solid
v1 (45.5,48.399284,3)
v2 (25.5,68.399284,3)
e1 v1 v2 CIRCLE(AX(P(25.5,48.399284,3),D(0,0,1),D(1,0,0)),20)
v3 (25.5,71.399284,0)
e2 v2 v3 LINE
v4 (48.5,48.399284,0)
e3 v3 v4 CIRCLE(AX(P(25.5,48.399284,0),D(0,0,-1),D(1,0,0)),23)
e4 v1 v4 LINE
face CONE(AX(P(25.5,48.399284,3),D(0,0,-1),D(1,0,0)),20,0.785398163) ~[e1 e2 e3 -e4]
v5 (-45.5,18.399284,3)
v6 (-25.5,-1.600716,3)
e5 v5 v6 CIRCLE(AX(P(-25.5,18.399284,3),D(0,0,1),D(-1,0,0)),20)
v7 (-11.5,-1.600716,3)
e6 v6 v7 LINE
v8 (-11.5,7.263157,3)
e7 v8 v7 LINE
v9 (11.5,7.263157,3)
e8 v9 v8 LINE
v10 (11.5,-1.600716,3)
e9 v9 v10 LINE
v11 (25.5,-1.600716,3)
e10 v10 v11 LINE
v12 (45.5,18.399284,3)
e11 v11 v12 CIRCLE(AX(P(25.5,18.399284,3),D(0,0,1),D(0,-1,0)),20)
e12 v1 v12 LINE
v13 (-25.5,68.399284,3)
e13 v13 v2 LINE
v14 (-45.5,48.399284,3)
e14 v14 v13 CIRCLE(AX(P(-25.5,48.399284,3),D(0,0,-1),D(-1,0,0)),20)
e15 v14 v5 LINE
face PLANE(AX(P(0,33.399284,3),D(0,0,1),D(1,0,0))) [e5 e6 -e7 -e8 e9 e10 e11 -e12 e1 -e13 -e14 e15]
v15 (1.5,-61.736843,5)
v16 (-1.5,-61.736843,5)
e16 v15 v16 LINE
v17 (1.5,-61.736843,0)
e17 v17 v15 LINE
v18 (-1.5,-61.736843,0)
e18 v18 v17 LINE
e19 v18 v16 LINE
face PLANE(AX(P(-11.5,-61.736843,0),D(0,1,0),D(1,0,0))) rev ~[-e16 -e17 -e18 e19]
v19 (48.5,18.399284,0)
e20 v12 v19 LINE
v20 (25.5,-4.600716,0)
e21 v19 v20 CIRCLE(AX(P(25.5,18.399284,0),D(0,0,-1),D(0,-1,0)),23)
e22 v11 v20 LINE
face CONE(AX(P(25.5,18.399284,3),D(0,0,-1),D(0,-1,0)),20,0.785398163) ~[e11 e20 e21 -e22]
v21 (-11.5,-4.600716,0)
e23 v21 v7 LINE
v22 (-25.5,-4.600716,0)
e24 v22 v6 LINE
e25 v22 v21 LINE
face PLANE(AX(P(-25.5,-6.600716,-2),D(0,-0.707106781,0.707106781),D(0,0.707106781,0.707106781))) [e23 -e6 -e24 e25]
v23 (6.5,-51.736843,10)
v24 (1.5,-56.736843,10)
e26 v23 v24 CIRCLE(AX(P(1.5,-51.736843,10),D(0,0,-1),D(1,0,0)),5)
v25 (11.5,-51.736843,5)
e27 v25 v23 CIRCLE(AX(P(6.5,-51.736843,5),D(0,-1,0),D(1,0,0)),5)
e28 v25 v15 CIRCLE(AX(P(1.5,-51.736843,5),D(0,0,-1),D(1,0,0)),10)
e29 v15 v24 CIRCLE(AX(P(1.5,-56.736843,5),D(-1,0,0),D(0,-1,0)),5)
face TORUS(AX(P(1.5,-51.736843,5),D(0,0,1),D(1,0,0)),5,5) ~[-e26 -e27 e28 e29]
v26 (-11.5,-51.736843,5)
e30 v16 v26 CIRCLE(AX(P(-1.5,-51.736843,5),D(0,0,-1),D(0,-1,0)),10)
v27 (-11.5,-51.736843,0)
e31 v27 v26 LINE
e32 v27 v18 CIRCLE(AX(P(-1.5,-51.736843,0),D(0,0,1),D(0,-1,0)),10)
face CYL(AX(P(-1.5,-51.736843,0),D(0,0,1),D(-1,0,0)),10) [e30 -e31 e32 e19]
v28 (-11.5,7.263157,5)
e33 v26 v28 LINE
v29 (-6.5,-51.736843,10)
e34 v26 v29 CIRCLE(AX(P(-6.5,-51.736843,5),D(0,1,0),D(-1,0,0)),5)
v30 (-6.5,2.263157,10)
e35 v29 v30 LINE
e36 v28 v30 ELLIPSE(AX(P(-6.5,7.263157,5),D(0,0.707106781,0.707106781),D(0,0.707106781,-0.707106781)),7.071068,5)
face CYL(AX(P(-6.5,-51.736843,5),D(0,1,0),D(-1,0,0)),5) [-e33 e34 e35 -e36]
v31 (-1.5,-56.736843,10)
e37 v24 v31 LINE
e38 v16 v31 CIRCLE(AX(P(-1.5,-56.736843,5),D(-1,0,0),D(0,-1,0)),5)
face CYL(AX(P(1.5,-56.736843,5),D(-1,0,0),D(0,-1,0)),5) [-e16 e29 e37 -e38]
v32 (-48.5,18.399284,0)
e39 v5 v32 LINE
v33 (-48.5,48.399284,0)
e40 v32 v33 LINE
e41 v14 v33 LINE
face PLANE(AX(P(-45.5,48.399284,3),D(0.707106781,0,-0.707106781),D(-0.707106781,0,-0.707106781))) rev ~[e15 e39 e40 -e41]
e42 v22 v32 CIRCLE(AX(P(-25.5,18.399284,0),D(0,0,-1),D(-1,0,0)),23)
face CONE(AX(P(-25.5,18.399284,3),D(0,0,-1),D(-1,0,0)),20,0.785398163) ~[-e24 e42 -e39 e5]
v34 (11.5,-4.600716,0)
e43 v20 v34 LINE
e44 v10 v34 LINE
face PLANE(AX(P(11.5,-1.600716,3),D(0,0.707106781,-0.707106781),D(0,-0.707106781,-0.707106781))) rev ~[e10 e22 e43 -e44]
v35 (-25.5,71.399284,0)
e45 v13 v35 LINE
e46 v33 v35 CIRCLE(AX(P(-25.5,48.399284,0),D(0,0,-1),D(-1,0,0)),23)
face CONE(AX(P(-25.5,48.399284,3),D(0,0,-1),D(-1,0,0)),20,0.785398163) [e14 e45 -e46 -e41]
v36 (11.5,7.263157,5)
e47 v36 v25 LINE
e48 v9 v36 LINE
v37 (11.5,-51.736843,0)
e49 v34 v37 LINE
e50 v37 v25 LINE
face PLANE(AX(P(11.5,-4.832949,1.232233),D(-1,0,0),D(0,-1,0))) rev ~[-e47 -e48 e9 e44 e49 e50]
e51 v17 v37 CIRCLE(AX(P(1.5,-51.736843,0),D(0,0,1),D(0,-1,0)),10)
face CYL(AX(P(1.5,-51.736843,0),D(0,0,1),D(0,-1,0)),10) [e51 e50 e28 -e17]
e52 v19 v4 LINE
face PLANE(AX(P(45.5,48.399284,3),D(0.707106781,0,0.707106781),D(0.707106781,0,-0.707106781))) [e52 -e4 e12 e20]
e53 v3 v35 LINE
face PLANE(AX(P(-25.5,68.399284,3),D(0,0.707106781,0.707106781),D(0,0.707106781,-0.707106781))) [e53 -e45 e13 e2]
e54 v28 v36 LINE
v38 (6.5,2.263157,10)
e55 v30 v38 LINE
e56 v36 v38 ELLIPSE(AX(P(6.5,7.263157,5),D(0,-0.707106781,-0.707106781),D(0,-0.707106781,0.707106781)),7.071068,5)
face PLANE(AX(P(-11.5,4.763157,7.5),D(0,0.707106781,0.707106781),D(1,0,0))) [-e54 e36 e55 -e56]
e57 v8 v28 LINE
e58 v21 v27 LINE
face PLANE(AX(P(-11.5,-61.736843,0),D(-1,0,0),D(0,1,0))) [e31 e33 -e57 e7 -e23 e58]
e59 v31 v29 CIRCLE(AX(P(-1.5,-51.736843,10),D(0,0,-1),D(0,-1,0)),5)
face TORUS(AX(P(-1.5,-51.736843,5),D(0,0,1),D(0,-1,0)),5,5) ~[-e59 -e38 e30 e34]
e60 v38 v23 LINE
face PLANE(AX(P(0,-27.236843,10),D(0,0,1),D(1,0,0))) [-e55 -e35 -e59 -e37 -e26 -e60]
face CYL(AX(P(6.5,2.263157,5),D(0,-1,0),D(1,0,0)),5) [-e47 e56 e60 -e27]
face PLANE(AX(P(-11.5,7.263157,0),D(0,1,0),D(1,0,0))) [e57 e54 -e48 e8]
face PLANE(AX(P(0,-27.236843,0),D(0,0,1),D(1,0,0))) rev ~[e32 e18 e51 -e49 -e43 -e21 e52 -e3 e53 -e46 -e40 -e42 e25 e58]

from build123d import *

# Parameters (mm, degrees)
F0_W         = 101
F0_H         = 80
F1_DEPTH     = 3
F2_R         = 25
F3_W         = 23
F3_H         = 69
F4_DEPTH     = 10
F5_R         = 10
F6_SIZE      = 5
F7_R         = 5
F8_T1_DEPTH  = 30
F8_T3_DEPTH  = 51
F8_T5_DEPTH  = 14
F8_T7_DEPTH  = 14
F8_T10_ANGLE = 90
F8_T12_ANGLE = 90
F8_T14_ANGLE = 90
F8_T16_ANGLE = 90


# Not quite as in the source:
# - a fillet or chamfer that OpenCascade refuses, or shapes differently, is made with other operations: its cross-section is extruded or revolved along the edge and cut away or added


with BuildPart() as f1:
    # F0 (on Top) → F1 (new body)
    with BuildSketch(Plane.XY):
        with Locations((0, 33.399283886)):
            Rectangle(F0_W, F0_H)
    extrude(amount=F1_DEPTH)

    # F2
    f2_edges = [f1.edges().sort_by_distance(p)[0] for p in [
        (50.5, -6.600716, 1.5),
        (50.5, 73.399284, 1.5),
        (-50.5, -6.600716, 1.5),
        (-50.5, 73.399284, 1.5),
    ]]
    fillet(f2_edges, radius=F2_R)

    # F3 (on Top) → F4 (join)
    with BuildSketch(Plane.XY):
        with Locations((0, -27.2368434817)):
            Rectangle(F3_W, F3_H)
    extrude(amount=F4_DEPTH)

    # F5
    f5_edges = [f1.edges().sort_by_distance(p)[0] for p in [
        (11.5, -61.736843, 5),
        (-11.5, -61.736843, 5),
    ]]
    fillet(f5_edges, radius=F5_R)

    # F6
    f6_edges = [f1.edges().sort_by_distance(p)[0] for p in [
        (0, 7.263157, 10),
    ]]
    chamfer(f6_edges, length=F6_SIZE)

    # F7
    f7_edges = [f1.edges().sort_by_distance(p)[0] for p in [
        (-11.5, -24.736843, 10),
    ]]
    fillet(f7_edges, radius=F7_R)

    # F8: chamfer of 5 on 1 edges, made by hand

    # F8_s2 → F8_t1 (cut)
    with BuildSketch(Plane.XZ.offset(-48.399283886)):
        Polygon((-45.5, 3), (-50.5, -2), (-50.5, 3), align=None)
        Polygon((45.5, 3), (50.5, -2), (50.5, 3), align=None)
    extrude(amount=F8_T1_DEPTH, mode=Mode.SUBTRACT)

    # F8_s4 → F8_t3 (cut)
    with BuildSketch(Plane.YZ.offset(-25.5)):
        Polygon((68.399283886, 3), (73.399283886, -2), (73.399283886, 3), align=None)
    extrude(amount=F8_T3_DEPTH, mode=Mode.SUBTRACT)

    # F8_s6 → F8_t5 (cut)
    with BuildSketch(Plane.YZ.offset(11.5)):
        Polygon((-1.600716114, 3), (-6.600716114, -2), (-6.600716114, 3), align=None)
    extrude(amount=F8_T5_DEPTH, mode=Mode.SUBTRACT)

    # F8_s8 → F8_t7 (cut)
    with BuildSketch(Plane.YZ.offset(-25.5)):
        Polygon((-6.600716114, -2), (-1.600716114, 3), (-6.600716114, 3), align=None)
    extrude(amount=F8_T7_DEPTH, mode=Mode.SUBTRACT)

    # F8_s9 → F8_t10 (revolve, cut)
    with BuildSketch(Plane.XZ.offset(-48.399283886)):
        Polygon((-45.5, 3), (-50.5, -2), (-50.5, 3), align=None)
    revolve(axis=Axis((-25.5, 48.399283886, 3), (0, 0, -1)), revolution_arc=F8_T10_ANGLE, mode=Mode.SUBTRACT)

    # F8_s11 → F8_t12 (revolve, cut)
    with BuildSketch(Plane.XZ.offset(-48.399283886)):
        Polygon((45.5, 3), (50.5, -2), (50.5, 3), align=None)
    revolve(axis=Axis((25.5, 48.399283886, 3), (0, 0, 1)), revolution_arc=F8_T12_ANGLE, mode=Mode.SUBTRACT)

    # F8_s13 → F8_t14 (revolve, cut)
    with BuildSketch(Plane.YZ.offset(25.5)):
        Polygon((-1.600716114, 3), (-6.600716114, -2), (-6.600716114, 3), align=None)
    revolve(axis=Axis((25.5, 18.399283886, 3), (0, 0, 1)), revolution_arc=F8_T14_ANGLE, mode=Mode.SUBTRACT)

    # F8_s15 → F8_t16 (revolve, cut)
    with BuildSketch(Plane.XZ.offset(-18.399283886)):
        Polygon((-45.5, 3), (-50.5, -2), (-50.5, 3), align=None)
    revolve(axis=Axis((-25.5, 18.399283886, 3), (0, 0, 1)), revolution_arc=F8_T16_ANGLE, mode=Mode.SUBTRACT)


solid = f1.part
